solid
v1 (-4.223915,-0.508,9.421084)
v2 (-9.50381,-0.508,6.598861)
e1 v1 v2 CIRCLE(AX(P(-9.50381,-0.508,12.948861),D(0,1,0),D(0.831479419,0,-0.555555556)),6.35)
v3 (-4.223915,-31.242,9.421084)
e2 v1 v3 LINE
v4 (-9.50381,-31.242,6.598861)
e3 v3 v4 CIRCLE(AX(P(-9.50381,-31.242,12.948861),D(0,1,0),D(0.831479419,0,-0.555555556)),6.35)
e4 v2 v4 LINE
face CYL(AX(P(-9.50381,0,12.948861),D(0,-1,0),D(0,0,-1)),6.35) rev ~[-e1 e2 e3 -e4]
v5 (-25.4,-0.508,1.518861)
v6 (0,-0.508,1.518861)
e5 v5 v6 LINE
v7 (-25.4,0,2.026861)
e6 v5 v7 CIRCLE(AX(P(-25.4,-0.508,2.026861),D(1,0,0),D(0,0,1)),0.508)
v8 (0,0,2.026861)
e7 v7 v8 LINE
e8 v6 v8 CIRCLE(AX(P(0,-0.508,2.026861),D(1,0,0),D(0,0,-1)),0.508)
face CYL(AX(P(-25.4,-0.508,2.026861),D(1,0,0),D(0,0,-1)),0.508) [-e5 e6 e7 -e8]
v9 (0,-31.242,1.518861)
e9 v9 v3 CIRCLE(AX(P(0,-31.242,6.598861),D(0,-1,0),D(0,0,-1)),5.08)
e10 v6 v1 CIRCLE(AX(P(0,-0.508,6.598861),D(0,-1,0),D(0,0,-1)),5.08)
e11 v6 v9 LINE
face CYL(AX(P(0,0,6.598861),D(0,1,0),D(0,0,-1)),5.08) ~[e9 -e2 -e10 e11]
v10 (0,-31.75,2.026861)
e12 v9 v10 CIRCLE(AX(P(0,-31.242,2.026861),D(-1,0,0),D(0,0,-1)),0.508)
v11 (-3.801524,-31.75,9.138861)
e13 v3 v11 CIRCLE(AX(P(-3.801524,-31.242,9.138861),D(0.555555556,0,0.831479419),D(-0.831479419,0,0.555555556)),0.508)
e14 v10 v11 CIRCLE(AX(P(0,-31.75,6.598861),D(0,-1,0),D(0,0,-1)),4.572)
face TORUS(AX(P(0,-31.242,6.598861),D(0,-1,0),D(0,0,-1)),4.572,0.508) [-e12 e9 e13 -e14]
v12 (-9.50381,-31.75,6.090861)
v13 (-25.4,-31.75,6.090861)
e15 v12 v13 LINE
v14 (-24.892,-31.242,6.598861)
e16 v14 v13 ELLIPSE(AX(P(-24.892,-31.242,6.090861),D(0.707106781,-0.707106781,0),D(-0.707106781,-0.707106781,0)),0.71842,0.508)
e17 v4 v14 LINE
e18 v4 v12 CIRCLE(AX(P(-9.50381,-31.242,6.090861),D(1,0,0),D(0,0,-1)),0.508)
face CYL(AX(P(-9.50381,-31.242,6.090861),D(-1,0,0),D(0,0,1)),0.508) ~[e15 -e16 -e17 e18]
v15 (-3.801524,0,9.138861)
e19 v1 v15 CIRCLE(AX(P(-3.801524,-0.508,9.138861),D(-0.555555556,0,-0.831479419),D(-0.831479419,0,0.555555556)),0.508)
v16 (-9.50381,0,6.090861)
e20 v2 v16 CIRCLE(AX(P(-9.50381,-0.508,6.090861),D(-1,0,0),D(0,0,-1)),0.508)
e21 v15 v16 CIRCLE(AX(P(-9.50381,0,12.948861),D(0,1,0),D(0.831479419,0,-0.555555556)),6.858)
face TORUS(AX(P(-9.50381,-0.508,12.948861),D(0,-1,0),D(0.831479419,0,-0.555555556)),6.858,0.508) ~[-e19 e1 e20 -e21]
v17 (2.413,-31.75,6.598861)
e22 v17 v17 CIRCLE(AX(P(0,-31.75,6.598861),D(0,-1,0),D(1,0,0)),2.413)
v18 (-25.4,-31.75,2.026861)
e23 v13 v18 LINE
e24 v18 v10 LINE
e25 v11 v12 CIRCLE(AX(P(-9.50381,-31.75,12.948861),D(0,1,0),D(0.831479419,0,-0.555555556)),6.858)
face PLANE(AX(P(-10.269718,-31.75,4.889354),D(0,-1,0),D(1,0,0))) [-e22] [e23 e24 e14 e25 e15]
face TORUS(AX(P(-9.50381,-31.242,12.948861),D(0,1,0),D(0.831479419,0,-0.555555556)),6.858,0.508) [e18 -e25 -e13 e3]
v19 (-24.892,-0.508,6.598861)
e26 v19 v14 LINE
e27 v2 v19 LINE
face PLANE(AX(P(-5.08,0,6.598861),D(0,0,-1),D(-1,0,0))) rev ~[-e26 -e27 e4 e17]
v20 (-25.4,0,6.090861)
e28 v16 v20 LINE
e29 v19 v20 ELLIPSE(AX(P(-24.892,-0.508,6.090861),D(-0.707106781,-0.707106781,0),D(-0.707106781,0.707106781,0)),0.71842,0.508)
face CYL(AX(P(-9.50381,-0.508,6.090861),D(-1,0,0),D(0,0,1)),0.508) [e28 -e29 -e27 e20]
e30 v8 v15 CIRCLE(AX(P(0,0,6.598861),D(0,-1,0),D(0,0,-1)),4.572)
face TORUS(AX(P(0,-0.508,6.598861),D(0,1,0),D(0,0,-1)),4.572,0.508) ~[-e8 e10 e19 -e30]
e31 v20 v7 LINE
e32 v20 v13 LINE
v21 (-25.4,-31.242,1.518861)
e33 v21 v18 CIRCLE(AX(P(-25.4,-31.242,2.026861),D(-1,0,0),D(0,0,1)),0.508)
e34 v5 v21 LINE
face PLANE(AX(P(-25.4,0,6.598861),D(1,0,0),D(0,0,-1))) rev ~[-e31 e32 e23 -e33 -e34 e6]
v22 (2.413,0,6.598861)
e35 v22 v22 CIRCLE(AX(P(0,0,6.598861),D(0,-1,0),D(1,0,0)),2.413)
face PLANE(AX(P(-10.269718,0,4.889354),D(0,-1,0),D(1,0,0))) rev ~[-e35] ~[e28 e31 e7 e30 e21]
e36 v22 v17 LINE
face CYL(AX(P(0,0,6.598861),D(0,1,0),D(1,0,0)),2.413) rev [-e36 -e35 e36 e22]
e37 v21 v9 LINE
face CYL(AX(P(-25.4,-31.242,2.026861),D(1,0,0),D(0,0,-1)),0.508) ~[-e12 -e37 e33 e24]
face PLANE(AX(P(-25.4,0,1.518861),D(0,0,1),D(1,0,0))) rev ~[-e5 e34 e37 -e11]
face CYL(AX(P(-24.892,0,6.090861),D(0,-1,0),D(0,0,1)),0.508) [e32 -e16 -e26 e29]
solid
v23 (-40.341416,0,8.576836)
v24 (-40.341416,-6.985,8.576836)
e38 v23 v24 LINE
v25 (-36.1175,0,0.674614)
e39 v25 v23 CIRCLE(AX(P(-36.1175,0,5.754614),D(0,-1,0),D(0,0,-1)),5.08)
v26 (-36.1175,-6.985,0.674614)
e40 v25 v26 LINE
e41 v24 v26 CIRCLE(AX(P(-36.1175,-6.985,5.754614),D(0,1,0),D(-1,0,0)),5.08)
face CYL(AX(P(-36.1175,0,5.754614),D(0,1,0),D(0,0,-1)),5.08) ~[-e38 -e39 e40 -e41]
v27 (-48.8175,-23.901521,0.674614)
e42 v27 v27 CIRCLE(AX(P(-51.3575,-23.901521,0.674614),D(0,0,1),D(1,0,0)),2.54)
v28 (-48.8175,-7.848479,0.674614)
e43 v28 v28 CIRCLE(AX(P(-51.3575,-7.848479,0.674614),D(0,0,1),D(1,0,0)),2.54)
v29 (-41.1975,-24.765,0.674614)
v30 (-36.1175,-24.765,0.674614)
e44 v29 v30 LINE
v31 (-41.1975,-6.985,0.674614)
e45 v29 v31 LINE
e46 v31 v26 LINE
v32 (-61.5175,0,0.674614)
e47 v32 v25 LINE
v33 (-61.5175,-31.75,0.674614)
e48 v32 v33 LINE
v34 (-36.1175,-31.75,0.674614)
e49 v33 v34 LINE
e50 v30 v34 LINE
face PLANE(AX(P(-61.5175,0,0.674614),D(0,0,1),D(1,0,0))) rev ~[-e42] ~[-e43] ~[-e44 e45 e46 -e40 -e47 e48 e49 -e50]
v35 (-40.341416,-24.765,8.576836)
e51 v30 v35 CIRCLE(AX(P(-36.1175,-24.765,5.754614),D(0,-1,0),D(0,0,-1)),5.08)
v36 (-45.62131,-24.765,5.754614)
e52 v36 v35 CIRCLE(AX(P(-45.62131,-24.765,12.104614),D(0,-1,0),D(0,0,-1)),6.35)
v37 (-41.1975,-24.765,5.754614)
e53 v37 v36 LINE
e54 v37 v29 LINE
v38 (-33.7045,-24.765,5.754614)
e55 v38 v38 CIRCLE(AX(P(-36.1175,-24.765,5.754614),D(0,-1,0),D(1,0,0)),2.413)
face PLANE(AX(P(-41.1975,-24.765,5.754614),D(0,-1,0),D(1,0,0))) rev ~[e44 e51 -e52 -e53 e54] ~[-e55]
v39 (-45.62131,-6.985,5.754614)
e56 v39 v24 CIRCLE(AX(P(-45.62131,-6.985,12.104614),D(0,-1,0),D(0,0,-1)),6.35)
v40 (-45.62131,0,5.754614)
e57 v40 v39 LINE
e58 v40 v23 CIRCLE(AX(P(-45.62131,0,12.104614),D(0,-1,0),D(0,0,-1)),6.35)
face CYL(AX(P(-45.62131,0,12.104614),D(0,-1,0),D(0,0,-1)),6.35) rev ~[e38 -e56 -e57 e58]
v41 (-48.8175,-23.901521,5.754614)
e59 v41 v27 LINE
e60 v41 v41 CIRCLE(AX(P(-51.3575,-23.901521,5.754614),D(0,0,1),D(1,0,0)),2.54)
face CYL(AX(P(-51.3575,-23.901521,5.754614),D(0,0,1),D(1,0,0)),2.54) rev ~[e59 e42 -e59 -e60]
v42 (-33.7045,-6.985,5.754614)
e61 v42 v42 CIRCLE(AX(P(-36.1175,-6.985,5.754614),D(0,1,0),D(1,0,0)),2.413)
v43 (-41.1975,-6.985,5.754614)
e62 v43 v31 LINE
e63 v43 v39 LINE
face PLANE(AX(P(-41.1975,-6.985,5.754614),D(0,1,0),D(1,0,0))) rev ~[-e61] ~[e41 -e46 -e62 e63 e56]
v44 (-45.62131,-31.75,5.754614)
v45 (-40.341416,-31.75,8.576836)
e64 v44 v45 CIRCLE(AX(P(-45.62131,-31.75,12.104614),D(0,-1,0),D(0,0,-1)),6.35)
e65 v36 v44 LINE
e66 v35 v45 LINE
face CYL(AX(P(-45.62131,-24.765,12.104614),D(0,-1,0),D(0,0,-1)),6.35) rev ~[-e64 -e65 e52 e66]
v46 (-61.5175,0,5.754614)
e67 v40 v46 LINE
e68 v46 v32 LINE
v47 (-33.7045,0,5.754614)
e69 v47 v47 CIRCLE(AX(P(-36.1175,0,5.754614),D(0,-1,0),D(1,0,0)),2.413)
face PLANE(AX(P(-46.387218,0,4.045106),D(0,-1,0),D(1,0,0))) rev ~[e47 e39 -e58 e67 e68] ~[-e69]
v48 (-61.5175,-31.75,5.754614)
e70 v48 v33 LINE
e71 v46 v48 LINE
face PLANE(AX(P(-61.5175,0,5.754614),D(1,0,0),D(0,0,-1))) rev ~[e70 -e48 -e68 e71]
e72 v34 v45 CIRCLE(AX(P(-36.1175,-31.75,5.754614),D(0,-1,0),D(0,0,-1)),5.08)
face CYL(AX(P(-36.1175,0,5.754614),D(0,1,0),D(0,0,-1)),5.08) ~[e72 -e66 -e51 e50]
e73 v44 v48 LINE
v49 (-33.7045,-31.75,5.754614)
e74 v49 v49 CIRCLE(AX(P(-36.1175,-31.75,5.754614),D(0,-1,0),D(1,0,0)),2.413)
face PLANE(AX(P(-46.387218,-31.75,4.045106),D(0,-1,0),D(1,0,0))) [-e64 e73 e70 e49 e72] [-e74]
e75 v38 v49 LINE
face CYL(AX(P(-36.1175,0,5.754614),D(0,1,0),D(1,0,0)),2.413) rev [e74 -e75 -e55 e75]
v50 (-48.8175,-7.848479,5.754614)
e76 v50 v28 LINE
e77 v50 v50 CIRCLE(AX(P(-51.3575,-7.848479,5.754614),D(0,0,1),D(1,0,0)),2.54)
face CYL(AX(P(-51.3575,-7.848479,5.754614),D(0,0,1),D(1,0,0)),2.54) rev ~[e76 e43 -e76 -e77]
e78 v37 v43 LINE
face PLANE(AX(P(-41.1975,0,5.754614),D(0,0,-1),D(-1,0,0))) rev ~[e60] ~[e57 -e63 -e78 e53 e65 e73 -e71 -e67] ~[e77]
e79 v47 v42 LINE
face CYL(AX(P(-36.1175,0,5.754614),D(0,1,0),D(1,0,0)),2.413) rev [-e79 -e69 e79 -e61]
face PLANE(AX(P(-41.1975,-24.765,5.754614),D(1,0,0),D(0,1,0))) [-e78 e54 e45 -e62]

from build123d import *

# Parameters (mm, degrees)
F0_R          = 2.413
F1_DEPTH      = 31.75
F2_W          = 10.16
F2_H          = 17.78
F3_DEPTH      = 5.08
F3_DEPTH_BACK = 107
F4_R          = 2.54
F5_DEPTH      = 5.08
F6_R          = 6.35
F6_2_R        = 6.35
F7_R          = 0.508


# Not quite as in the source:
# - an extrude ends at something that could not be found from the text; its depth is read off the source's solid


with BuildPart() as f1:
    # F0 (on Front) → F1 (new body)
    with BuildSketch(Plane.XZ):
        with BuildLine():
            Line((-41.1975002551, 5.7546137058), (-61.5175002551, 5.7546137058))
            Line((-61.5175002551, 5.7546137058), (-61.5175002551, 0.6746137058))
            Line((-61.5175002551, 0.6746137058), (-36.1175002551, 0.6746137058))
            ThreePointArc((-36.1175002551, 0.6746137058), (-32.5253978067, 9.3467161542), (-41.1975002551, 5.7546137058))
        make_face()
        with Locations((-36.1175002551, 5.7546137058)):
            Circle(F0_R, mode=Mode.SUBTRACT)
    extrude(amount=F1_DEPTH)

    # F2 (on face) → F3 (cut, two sides)
    with BuildSketch(Plane.XY.offset(5.7546137058)) as f3_sk:
        with Locations((-36.1175002551, -15.875)):
            Rectangle(F2_W, F2_H)
    extrude(amount=-F3_DEPTH, mode=Mode.SUBTRACT)
    extrude(f3_sk.sketch, amount=F3_DEPTH_BACK, mode=Mode.SUBTRACT)

    # F4 (on face) → F5 (cut, through all)
    with BuildSketch(Plane.XY.offset(5.7546137058)):
        with Locations((-51.3575002551, -7.8484792235)):
            Circle(F4_R)
        with Locations((-51.3575002551, -23.9015207765)):
            Circle(F4_R)
    extrude(amount=-F5_DEPTH, mode=Mode.SUBTRACT)

    # F6#2
    f6_2_edges = [f1.edges().sort_by_distance(p)[0] for p in [
        (-41.1975, -3.4925, 5.754614),
        (-41.1975, -28.2575, 5.754614),
    ]]
    fillet(f6_2_edges, radius=F6_2_R)


with BuildPart() as f1b:
    # F0 (on Front) → F1, piece 2 (new body)
    with BuildSketch(Plane.XZ):
        with BuildLine():
            Line((-5.08, 6.5988614224), (-25.4, 6.5988614224))
            Line((-25.4, 6.5988614224), (-25.4, 1.5188614224))
            Line((-25.4, 1.5188614224), (0, 1.5188614224))
            ThreePointArc((0, 1.5188614224), (3.5921024484, 10.1909638708), (-5.08, 6.5988614224))
        make_face()
        with Locations((0, 6.5988614224)):
            Circle(F0_R, mode=Mode.SUBTRACT)
    extrude(amount=F1_DEPTH)

    # F6
    f6_edges = [f1b.edges().sort_by_distance(p)[0] for p in [
        (-5.08, -15.875, 6.598861),
    ]]
    fillet(f6_edges, radius=F6_R)

    # F7
    f7_edges = [f1b.edges().sort_by_distance(p)[0] for p in [
        (-17.451905, -31.75, 6.598861),
        (-17.451905, 0, 6.598861),
        (-25.4, -15.875, 6.598861),
        (4.480139, 0, 8.993596),
        (4.480139, -31.75, 8.993596),
        (-6.510391, 0, 7.348688),
        (-12.7, 0, 1.518861),
        (-6.510391, -31.75, 7.348688),
        (-12.7, -31.75, 1.518861),
    ]]
    fillet(f7_edges, radius=F7_R)


solid = Compound([f1.part, f1b.part])
